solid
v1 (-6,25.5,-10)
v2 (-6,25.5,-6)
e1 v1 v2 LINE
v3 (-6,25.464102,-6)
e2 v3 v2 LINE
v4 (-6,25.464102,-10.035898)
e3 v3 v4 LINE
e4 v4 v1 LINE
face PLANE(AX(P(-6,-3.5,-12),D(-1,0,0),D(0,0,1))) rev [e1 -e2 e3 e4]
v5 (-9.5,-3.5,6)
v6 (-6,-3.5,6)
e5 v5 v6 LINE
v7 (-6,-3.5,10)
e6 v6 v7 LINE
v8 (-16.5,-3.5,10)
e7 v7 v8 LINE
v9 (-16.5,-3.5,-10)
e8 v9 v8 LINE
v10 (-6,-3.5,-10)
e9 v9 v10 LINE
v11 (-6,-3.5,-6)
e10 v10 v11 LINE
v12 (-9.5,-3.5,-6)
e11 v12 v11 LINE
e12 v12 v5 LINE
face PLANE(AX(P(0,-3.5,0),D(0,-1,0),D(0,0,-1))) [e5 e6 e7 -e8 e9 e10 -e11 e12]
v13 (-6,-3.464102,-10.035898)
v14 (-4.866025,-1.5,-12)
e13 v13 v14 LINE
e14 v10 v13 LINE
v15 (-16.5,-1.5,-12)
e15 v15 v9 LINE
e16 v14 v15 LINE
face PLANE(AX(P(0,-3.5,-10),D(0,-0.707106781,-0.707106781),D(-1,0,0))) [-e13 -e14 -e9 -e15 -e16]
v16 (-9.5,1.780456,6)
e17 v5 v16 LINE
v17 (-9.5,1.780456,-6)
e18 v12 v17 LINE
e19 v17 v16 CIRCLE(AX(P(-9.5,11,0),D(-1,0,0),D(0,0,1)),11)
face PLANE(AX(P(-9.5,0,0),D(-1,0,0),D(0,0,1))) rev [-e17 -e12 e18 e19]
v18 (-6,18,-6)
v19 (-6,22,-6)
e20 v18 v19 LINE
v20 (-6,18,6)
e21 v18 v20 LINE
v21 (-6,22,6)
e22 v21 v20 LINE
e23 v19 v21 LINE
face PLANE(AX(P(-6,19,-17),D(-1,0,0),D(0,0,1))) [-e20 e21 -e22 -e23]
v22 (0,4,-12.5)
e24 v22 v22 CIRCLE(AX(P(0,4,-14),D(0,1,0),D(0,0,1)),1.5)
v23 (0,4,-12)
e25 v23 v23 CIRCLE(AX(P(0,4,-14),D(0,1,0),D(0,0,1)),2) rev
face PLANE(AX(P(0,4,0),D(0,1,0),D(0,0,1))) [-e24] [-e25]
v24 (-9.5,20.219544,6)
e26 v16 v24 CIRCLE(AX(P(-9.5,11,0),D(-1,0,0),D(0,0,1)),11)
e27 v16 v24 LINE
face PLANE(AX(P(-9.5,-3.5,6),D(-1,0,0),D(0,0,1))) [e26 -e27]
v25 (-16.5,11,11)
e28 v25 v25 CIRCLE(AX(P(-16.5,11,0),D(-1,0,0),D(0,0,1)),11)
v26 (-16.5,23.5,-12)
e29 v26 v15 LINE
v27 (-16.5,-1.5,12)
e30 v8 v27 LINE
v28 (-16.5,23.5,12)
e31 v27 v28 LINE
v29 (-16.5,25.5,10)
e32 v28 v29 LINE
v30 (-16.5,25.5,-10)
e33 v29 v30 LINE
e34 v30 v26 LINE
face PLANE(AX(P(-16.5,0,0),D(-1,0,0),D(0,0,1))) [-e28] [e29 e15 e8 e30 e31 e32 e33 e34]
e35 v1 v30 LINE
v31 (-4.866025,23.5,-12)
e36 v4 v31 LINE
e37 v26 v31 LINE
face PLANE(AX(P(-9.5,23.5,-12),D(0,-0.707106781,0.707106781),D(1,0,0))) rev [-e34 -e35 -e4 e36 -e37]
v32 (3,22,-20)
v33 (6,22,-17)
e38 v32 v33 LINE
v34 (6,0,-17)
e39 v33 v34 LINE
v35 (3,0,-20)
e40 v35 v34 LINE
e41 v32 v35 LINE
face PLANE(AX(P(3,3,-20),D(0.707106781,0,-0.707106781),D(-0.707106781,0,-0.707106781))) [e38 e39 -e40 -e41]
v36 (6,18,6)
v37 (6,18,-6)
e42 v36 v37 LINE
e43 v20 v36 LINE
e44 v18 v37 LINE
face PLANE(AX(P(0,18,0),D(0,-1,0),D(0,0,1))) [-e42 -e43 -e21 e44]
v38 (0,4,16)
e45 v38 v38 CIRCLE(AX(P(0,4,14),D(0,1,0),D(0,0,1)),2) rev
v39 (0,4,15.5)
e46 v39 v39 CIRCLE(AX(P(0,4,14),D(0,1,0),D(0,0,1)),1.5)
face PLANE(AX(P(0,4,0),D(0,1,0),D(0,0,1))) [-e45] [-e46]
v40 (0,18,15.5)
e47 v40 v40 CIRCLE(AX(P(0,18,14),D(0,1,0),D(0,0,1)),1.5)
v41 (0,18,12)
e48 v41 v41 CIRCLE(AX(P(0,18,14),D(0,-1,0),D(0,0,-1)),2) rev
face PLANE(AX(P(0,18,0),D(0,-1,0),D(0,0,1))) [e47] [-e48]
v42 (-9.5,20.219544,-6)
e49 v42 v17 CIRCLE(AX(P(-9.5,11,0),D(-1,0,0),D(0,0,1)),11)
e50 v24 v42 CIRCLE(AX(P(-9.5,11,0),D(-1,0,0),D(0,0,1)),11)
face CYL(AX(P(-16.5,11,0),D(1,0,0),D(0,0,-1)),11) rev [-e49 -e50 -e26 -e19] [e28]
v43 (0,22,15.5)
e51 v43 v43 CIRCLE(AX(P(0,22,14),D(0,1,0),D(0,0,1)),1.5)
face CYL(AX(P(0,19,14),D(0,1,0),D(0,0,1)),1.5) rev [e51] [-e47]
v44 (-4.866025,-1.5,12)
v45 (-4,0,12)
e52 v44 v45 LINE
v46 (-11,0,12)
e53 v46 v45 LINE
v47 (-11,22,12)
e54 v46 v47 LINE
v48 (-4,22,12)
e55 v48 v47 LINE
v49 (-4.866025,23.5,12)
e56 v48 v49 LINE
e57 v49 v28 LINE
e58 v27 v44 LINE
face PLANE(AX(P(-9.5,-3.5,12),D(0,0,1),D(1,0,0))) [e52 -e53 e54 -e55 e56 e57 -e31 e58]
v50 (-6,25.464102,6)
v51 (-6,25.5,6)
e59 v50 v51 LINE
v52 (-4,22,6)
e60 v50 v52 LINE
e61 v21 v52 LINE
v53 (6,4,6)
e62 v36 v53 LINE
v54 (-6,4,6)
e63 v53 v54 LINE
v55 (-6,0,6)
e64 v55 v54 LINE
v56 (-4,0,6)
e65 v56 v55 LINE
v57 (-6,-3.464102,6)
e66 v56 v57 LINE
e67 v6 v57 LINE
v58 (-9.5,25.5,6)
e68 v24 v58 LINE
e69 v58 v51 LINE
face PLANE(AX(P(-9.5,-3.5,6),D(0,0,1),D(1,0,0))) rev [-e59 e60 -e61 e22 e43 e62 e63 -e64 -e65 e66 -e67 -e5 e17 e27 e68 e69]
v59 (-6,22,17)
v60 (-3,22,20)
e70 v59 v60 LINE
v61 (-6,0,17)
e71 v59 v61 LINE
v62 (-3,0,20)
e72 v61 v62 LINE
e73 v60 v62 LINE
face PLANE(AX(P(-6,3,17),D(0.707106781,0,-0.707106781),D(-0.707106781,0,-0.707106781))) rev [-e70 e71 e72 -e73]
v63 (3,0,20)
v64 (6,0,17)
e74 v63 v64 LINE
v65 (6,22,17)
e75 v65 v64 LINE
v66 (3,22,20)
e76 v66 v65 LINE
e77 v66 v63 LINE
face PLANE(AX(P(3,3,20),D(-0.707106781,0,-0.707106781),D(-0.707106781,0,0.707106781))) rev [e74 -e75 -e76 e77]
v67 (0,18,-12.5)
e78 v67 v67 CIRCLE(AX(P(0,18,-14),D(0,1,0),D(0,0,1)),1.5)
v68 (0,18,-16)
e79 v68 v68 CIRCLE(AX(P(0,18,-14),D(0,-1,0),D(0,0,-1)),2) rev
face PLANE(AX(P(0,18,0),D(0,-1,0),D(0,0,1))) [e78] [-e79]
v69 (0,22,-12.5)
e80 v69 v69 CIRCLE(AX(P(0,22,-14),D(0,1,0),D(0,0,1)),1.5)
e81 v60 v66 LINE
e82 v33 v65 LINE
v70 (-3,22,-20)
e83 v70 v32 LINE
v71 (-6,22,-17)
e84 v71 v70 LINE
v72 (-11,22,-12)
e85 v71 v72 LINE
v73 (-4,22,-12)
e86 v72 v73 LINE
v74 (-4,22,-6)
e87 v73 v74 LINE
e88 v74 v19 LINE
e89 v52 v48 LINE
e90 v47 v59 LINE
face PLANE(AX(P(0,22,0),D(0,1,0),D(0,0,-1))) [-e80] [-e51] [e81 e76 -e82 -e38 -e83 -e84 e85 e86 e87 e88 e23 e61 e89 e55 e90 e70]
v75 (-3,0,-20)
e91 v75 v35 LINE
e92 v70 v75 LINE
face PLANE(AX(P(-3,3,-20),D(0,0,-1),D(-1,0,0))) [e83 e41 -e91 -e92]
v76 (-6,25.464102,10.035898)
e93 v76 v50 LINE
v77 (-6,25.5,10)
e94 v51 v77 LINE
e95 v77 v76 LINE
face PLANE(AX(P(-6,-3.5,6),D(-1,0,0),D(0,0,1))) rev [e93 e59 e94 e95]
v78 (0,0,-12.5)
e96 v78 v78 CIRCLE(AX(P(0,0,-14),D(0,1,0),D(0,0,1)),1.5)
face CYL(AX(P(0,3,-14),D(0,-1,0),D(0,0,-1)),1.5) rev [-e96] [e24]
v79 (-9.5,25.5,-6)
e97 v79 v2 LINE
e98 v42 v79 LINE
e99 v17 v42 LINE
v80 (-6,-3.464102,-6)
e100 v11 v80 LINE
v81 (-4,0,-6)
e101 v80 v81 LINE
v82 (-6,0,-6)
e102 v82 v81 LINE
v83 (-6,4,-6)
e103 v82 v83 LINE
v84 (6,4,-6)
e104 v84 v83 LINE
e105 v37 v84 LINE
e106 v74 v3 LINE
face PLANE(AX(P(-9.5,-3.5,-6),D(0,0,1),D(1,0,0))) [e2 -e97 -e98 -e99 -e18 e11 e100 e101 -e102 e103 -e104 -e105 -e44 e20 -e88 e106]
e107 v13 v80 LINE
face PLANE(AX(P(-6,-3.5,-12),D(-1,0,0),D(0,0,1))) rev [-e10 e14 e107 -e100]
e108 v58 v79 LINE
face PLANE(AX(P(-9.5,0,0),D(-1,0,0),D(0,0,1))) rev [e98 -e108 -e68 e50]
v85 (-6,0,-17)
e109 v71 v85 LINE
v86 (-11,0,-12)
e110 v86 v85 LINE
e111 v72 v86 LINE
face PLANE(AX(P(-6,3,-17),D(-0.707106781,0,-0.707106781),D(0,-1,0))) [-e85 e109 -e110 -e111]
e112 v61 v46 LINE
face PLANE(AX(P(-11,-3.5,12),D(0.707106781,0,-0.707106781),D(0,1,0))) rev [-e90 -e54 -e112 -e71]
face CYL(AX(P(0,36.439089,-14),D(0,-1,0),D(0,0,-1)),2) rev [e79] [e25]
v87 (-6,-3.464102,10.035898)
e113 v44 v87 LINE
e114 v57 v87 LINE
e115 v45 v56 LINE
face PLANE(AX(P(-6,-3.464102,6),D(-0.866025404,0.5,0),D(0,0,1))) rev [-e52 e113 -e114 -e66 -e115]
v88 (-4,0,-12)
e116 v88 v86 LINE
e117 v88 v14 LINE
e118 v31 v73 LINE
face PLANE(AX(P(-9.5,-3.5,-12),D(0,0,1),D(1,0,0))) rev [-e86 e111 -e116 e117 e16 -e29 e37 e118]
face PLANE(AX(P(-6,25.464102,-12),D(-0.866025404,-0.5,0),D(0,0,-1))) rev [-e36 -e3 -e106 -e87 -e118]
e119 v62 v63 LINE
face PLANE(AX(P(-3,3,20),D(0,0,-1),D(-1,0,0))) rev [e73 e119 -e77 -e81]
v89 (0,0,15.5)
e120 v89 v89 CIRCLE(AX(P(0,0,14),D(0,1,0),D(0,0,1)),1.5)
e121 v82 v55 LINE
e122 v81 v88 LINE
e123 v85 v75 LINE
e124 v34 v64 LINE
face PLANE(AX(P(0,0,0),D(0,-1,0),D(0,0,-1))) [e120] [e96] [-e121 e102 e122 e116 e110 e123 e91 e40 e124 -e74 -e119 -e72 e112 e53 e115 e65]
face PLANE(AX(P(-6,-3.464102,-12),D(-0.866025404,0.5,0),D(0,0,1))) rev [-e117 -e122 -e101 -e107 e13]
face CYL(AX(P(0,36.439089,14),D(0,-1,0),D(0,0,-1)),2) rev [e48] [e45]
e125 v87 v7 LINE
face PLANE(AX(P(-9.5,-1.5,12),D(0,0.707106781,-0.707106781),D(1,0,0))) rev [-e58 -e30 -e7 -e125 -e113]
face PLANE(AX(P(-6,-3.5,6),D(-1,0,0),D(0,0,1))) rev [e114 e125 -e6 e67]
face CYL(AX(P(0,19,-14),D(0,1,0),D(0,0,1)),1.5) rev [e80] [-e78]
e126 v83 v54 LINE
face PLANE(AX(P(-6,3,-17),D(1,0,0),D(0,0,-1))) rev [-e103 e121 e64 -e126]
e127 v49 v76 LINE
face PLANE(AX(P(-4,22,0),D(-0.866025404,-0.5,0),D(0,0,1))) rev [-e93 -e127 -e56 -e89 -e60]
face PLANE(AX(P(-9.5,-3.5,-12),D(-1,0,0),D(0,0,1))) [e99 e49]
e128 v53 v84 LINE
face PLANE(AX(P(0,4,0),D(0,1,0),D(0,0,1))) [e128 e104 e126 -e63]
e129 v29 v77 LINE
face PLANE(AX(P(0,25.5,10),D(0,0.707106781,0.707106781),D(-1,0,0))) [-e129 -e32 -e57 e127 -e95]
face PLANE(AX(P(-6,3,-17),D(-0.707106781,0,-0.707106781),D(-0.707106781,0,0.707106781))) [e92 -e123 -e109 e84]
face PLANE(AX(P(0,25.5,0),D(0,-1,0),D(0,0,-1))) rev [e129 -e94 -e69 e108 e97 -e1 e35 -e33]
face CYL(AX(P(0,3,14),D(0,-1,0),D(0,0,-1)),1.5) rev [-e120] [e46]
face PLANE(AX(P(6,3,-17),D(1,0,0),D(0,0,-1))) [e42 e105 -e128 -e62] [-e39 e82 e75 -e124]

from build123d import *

# Parameters (mm, degrees)
SKETCH1_R           = 1.5
BOSS_EXTRUDE1_DEPTH = 3
BOSS_EXTRUDE2_START = 22.5
SKETCH2_W           = 3.5
SKETCH2_H           = 6
BOSS_EXTRUDE2_DEPTH = 29
SKETCH4_R           = 1.5
BOSS_EXTRUDE5_DEPTH = 1
CHAMFER2_SIZE       = 2
CHAMFER2_SIZE2      = 3.464101615
SKETCH3_W           = 24
SKETCH3_H           = 29
SKETCH3_R           = 11
BOSS_EXTRUDE4_DEPTH = 7
CHAMFER3_SIZE       = 2
SKETCH5_R           = 2
BOSS_EXTRUDE6_DEPTH = 14
CHAMFER5_SIZE       = 5


# Read off the part's stored shape, not the designer's step: Mirror1
with BuildPart() as part:
    # Sketch1 → Boss-Extrude1 (new body)
    with BuildSketch(Plane(origin=(0, 0, 0), x_dir=(1, 0, 0), z_dir=(0, 1, 0))):
        Polygon((-6, 17), (-3, 20), (3, 20), (6, 17), (6, -17), (3, -20), (-3, -20), (-6, -17), align=None)
        with Locations(Location((0, 14, 0), (0, 0, 270))):
            Circle(SKETCH1_R, mode=Mode.SUBTRACT)
        with Locations(Location((0, -14, 0), (0, 0, 270))):
            Circle(SKETCH1_R, mode=Mode.SUBTRACT)
    extrude(amount=BOSS_EXTRUDE1_DEPTH)

    # Sketch2 → Boss-Extrude2 (add)
    with BuildSketch(Plane(origin=(0, 3, 0), x_dir=(1, 0, 0), z_dir=(0, 1, 0)).offset(BOSS_EXTRUDE2_START)):
        with Locations((-7.75, 9)):
            Rectangle(SKETCH2_W, SKETCH2_H)
        with Locations((-7.75, -9)):
            Rectangle(SKETCH2_W, SKETCH2_H)
    extrude(amount=-BOSS_EXTRUDE2_DEPTH)

    # Sketch4 → Boss-Extrude5 (add)
    with BuildSketch(Plane(origin=(0, 3, 0), x_dir=(1, 0, 0), z_dir=(0, 1, 0))):
        Polygon((-3, 20), (-6, 17), (-6, 12), (-6, 6), (-6, -6), (-6, -12), (-6, -17), (-3, -20), (3, -20), (6, -17), (6, 17), (3, 20), align=None)
        with Locations(Location((0, 14, 0), (0, 0, 270))):
            Circle(SKETCH4_R, mode=Mode.SUBTRACT)
        with Locations(Location((0, -14, 0), (0, 0, 270))):
            Circle(SKETCH4_R, mode=Mode.SUBTRACT)
    extrude(amount=BOSS_EXTRUDE5_DEPTH)

    # Chamfer2
    chamfer2_edges = [part.edges().sort_by_distance(p)[0] for p in [
        (-6, 0, -9),
        (-6, 0, 9),
    ]]
    chamfer2_side = [part.faces().sort_by_distance(p)[0] for p in [
        (0, 0, 0),
    ]]
    chamfer(chamfer2_edges, length=CHAMFER2_SIZE, length2=CHAMFER2_SIZE2, reference=chamfer2_side[0])

    # Sketch3 → Boss-Extrude4 (add)
    with BuildSketch(Plane.ZY.offset(9.5)):
        with Locations((0, 11)):
            Rectangle(SKETCH3_W, SKETCH3_H)
        with Locations(Location((0, 11, 0), (0, 0, 236.944268849))):
            Circle(SKETCH3_R, mode=Mode.SUBTRACT)
    extrude(amount=BOSS_EXTRUDE4_DEPTH)

    # Chamfer3
    chamfer3_edges = [part.edges().sort_by_distance(p)[0] for p in [
        (-11.25, 25.5, -12),
        (-11.25, -3.5, -12),
        (-11.25, -3.5, 12),
        (-11.25, 25.5, 12),
    ]]
    chamfer(chamfer3_edges, length=CHAMFER3_SIZE)

    # Mirror1: part across plane


with BuildPart() as part_1:
    add(part.part)
    add(part.part.mirror(Plane(origin=(0, 11, 0), x_dir=(0, 0, 1), z_dir=(0, -1, 0))))

    # Sketch5 → Boss-Extrude6 (add)
    # profile 1 of 2: a face of its own
    with BuildSketch(Plane(origin=(0, 4, 0), x_dir=(1, 0, 0), z_dir=(0, 1, 0))):
        Polygon((6, -6), (-6, -6), (-6, -17), (-3, -20), (3, -20), (6, -17), align=None)
        with Locations(Location((0, -14, 0), (0, 0, 90))):
            Circle(SKETCH5_R, mode=Mode.SUBTRACT)
    # profile 2 of 2: a face of its own
    with BuildSketch(Plane(origin=(0, 4, 0), x_dir=(1, 0, 0), z_dir=(0, 1, 0))):
        Polygon((-6, 17), (-6, 6), (6, 6), (6, 17), (3, 20), (-3, 20), align=None)
        with Locations(Location((0, 14, 0), (0, 0, 90))):
            Circle(SKETCH5_R, mode=Mode.SUBTRACT)
    extrude(amount=BOSS_EXTRUDE6_DEPTH)

    # Chamfer5
    chamfer5_edges = [part_1.edges().sort_by_distance(p)[0] for p in [
        (-6, 11, 12),
        (-6, 11, -12),
    ]]
    chamfer(chamfer5_edges, length=CHAMFER5_SIZE - 0.0001)  # a hair under: the kernel refuses the full size


solid = part_1.part
